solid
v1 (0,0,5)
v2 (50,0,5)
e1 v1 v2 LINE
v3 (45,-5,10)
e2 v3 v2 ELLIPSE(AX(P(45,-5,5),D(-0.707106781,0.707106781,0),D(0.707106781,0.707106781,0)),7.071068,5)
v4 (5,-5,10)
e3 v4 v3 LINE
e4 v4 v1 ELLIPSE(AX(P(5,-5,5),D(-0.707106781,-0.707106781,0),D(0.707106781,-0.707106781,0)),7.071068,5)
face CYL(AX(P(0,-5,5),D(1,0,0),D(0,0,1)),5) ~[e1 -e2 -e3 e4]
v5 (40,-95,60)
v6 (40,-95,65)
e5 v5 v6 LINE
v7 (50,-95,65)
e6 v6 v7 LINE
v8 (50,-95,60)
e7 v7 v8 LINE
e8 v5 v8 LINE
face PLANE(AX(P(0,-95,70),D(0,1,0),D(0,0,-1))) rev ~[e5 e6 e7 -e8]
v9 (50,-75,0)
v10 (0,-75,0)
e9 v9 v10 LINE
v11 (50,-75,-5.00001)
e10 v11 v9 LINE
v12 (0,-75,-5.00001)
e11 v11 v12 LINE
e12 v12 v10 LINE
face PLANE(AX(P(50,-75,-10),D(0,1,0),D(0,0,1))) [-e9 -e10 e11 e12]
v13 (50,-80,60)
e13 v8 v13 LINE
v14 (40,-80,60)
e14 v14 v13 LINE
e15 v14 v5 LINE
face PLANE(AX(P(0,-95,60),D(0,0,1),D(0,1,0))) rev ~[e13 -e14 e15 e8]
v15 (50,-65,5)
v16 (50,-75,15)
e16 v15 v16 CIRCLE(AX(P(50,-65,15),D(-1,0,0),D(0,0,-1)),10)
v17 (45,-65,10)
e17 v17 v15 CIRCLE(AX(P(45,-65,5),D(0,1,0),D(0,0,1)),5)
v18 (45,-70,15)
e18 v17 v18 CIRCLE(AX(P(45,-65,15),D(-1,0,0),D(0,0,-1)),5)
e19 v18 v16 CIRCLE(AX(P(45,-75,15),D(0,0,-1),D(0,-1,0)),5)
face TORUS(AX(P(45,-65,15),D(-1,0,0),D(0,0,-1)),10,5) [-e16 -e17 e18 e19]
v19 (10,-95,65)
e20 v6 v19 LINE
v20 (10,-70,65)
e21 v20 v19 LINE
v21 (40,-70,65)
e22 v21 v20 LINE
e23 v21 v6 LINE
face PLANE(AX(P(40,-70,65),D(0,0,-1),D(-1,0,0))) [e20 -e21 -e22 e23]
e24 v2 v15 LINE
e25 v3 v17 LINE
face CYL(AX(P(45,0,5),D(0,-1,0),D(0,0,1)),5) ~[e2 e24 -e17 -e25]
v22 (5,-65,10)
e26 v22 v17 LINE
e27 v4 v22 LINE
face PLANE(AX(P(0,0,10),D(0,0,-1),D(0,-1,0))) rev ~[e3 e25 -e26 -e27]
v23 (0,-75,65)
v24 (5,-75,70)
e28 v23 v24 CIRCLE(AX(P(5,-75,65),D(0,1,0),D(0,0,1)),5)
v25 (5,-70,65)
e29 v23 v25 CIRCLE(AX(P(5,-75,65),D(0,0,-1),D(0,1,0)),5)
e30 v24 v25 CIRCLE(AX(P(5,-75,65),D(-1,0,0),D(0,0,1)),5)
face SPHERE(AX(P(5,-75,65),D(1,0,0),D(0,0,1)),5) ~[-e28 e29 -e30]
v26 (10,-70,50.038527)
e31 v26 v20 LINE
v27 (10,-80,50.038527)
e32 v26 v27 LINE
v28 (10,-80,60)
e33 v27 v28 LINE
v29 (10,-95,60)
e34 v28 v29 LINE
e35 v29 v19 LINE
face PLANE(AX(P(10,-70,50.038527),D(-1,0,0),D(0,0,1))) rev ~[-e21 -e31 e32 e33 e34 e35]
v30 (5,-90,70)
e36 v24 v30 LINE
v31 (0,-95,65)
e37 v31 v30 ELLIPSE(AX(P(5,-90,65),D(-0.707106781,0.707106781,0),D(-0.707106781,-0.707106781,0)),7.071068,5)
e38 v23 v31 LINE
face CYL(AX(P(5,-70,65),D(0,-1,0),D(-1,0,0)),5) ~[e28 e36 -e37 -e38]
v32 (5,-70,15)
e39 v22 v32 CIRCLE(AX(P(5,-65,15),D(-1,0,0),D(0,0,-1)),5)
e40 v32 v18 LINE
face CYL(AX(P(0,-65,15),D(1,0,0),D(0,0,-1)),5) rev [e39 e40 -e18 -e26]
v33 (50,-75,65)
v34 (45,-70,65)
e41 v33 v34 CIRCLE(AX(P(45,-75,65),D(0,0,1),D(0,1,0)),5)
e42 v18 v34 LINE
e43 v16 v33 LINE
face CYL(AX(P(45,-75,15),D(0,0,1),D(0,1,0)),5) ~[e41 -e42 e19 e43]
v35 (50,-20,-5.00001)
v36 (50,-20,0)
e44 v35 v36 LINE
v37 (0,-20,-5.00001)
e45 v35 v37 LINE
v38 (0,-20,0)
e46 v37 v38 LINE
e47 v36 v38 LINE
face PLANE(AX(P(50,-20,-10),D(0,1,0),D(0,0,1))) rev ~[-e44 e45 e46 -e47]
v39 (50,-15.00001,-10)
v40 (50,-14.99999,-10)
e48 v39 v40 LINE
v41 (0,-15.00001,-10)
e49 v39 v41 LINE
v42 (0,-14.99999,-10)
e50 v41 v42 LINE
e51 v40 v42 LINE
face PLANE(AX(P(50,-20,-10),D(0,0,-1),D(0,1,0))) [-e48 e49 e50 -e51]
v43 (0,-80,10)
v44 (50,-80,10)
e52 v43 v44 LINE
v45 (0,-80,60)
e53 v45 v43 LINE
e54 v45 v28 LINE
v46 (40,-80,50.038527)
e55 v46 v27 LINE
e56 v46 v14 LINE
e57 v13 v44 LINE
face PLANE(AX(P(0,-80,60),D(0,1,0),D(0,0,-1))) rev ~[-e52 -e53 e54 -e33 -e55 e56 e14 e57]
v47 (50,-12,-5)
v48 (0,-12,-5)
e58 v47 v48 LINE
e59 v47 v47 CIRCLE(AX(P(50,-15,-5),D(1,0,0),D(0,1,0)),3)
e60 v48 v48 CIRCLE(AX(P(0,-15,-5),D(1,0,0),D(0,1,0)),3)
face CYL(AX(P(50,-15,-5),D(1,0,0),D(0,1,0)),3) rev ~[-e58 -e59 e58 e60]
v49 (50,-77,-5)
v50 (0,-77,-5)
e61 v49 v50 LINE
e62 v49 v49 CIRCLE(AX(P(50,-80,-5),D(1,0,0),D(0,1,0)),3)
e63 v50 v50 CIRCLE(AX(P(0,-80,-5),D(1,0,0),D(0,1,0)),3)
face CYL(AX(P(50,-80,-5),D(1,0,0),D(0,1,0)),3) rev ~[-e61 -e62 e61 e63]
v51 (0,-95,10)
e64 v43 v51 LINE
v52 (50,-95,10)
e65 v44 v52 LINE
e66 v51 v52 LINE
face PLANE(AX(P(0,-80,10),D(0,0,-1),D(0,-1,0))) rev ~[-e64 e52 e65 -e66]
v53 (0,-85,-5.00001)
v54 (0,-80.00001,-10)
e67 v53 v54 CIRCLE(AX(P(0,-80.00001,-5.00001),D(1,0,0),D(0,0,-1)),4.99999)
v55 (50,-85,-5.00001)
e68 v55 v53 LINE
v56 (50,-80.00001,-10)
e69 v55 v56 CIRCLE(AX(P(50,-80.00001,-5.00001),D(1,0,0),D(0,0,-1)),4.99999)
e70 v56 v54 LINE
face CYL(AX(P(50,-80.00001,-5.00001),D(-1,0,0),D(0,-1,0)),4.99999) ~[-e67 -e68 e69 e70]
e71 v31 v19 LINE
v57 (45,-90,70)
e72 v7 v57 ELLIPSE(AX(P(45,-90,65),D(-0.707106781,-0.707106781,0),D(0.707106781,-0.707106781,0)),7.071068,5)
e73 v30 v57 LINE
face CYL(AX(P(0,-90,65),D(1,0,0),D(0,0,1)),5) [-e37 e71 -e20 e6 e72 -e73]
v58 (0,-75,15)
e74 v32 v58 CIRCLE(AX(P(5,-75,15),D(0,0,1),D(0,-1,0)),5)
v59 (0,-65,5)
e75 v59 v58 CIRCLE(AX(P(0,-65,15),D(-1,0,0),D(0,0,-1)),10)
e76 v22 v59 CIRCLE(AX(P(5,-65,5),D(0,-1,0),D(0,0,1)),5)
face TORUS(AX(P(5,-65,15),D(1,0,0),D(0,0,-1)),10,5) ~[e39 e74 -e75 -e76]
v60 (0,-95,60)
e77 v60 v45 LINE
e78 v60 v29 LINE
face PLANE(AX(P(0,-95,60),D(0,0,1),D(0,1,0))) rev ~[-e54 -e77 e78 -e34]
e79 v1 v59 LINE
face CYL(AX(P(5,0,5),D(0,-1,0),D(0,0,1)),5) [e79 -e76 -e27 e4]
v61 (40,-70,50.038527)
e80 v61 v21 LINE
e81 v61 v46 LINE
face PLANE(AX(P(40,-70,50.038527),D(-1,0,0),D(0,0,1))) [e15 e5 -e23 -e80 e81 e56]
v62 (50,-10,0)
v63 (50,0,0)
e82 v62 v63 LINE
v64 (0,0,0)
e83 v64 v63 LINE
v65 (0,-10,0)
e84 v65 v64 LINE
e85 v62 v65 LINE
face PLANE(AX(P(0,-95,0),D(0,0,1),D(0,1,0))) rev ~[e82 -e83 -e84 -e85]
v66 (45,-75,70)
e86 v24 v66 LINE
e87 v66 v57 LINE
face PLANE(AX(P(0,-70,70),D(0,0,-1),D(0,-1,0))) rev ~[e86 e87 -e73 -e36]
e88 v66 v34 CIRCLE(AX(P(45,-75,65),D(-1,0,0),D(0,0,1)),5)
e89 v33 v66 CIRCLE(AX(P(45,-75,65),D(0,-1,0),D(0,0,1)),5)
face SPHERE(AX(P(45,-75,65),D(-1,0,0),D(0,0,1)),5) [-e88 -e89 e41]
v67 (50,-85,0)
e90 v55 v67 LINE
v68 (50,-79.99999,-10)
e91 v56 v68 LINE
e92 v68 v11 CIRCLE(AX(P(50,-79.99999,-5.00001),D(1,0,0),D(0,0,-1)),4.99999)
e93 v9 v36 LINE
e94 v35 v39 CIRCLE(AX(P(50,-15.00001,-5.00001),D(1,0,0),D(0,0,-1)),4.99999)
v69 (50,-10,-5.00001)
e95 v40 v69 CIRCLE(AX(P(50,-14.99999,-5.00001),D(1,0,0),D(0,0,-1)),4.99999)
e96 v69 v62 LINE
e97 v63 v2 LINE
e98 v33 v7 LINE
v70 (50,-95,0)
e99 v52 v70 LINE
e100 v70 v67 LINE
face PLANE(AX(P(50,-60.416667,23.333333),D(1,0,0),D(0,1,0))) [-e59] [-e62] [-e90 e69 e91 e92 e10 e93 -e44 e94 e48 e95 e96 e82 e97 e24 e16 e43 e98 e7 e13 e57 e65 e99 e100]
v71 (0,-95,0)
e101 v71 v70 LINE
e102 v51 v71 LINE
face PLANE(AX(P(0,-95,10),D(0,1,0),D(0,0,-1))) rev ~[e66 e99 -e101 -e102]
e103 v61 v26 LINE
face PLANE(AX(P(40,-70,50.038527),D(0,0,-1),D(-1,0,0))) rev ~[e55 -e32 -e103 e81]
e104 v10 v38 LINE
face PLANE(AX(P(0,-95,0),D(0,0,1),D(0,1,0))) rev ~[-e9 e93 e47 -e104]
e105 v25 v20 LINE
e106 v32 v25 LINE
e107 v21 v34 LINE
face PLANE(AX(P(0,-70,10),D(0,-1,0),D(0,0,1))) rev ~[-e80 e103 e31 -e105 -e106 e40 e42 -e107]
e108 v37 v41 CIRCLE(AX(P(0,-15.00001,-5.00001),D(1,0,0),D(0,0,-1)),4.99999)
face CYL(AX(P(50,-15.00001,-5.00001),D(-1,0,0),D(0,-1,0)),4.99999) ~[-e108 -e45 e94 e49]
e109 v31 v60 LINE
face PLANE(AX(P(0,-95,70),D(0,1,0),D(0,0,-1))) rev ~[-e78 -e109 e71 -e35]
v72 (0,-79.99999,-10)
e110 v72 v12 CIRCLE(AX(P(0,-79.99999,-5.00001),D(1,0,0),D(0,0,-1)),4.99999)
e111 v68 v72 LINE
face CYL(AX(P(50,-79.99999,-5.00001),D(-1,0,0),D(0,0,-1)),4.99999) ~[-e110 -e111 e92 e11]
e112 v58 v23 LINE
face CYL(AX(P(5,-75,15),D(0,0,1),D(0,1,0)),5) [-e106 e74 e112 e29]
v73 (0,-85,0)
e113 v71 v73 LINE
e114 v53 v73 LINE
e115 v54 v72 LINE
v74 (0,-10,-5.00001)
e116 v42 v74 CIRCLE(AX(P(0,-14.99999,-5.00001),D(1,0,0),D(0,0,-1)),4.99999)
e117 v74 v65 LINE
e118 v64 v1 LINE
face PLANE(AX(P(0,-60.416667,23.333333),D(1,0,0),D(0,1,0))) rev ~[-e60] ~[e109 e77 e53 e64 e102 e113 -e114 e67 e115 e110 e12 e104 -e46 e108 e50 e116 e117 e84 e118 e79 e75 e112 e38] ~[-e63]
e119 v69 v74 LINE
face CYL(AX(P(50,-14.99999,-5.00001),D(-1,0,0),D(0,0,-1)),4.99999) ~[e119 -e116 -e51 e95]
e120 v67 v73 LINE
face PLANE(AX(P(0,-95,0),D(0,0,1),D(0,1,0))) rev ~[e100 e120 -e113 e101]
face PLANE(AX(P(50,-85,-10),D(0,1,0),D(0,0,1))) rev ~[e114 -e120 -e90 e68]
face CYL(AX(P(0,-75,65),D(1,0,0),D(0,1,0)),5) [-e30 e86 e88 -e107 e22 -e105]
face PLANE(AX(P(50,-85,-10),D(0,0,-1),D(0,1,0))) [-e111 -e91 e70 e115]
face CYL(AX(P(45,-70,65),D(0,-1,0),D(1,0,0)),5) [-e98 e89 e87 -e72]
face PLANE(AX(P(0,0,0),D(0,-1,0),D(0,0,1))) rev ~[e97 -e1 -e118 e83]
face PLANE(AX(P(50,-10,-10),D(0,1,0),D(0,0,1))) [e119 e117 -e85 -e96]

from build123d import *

# Parameters (mm, degrees)
F1_DEPTH = 50
F2_F1_R  = 5
F2_F2_R  = 5
F3_W     = 10
F3_H     = 10
F3_R     = 3
F4_DEPTH = 50
F5_R     = 4.99999
F6_W     = 30
F6_H     = 14.961473023
F7_DEPTH = 25


# Not quite as in the source:
# - a fillet or chamfer is up to 0.001 mm smaller than in the source, because OpenCascade refuses the exact size


with BuildPart() as f1:
    # F0 (on Right) → F1 (new body)
    with BuildSketch(Plane.YZ):
        Polygon((-95, 0), (0, 0), (0, 10), (-70, 10), (-70, 70), (-82.7777751063, 70), (-95, 70), (-95, 60), (-80, 60), (-80, 10), (-95, 10), align=None)
    extrude(amount=F1_DEPTH)

    # F2: fillet of radius 5 on 8 edges, made by hand

    # F2_f1
    f2_f1_edges = [f1.edges().sort_by_distance(p)[0] for p in [
        (25, -70, 10),
    ]]
    fillet(f2_f1_edges, radius=F2_F1_R)

    # F2_f2
    f2_f2_edges = [f1.edges().sort_by_distance(p)[0] for p in [
        (25, -70, 70),
        (50, -82.5, 70),
        (0, -82.5, 70),
        (25, 0, 10),
        (50, -32.5, 10),
        (0, -32.5, 10),
        (25, -95, 70),
        (0, -68.5355339059, 11.4644660941),
        (50, -68.5355339059, 11.4644660941),
    ]]
    fillet(f2_f2_edges, radius=F2_F2_R)

    # F3 (on face) → F4 (join)
    with BuildSketch(Plane.YZ.offset(50)):
        with Locations((-80, -5)):
            Rectangle(F3_W, F3_H)
        with Locations((-80, -5)):
            Circle(F3_R, mode=Mode.SUBTRACT)
        with Locations((-15, -5)):
            Rectangle(F3_W, F3_H)
        with Locations((-15, -5)):
            Circle(F3_R, mode=Mode.SUBTRACT)
    extrude(amount=-F4_DEPTH)

    # F5 (radius 5 in the source; OpenCascade refuses exactly that, so slightly less here)
    f5_edges = [f1.edges().sort_by_distance(p)[0] for p in [
        (25, -75, -10),
        (25, -85, -10),
        (25, -20, -10),
        (25, -10, -10),
    ]]
    fillet(f5_edges, radius=F5_R)

    # F6 (on face) → F7 (cut)
    with BuildSketch(Plane(origin=(0, -70, 0), x_dir=(-1, 0, 0), z_dir=(0, 1, 0))):
        with Locations((-25, 57.5192634885)):
            Rectangle(F6_W, F6_H)
    extrude(amount=-F7_DEPTH, mode=Mode.SUBTRACT)


solid = f1.part
